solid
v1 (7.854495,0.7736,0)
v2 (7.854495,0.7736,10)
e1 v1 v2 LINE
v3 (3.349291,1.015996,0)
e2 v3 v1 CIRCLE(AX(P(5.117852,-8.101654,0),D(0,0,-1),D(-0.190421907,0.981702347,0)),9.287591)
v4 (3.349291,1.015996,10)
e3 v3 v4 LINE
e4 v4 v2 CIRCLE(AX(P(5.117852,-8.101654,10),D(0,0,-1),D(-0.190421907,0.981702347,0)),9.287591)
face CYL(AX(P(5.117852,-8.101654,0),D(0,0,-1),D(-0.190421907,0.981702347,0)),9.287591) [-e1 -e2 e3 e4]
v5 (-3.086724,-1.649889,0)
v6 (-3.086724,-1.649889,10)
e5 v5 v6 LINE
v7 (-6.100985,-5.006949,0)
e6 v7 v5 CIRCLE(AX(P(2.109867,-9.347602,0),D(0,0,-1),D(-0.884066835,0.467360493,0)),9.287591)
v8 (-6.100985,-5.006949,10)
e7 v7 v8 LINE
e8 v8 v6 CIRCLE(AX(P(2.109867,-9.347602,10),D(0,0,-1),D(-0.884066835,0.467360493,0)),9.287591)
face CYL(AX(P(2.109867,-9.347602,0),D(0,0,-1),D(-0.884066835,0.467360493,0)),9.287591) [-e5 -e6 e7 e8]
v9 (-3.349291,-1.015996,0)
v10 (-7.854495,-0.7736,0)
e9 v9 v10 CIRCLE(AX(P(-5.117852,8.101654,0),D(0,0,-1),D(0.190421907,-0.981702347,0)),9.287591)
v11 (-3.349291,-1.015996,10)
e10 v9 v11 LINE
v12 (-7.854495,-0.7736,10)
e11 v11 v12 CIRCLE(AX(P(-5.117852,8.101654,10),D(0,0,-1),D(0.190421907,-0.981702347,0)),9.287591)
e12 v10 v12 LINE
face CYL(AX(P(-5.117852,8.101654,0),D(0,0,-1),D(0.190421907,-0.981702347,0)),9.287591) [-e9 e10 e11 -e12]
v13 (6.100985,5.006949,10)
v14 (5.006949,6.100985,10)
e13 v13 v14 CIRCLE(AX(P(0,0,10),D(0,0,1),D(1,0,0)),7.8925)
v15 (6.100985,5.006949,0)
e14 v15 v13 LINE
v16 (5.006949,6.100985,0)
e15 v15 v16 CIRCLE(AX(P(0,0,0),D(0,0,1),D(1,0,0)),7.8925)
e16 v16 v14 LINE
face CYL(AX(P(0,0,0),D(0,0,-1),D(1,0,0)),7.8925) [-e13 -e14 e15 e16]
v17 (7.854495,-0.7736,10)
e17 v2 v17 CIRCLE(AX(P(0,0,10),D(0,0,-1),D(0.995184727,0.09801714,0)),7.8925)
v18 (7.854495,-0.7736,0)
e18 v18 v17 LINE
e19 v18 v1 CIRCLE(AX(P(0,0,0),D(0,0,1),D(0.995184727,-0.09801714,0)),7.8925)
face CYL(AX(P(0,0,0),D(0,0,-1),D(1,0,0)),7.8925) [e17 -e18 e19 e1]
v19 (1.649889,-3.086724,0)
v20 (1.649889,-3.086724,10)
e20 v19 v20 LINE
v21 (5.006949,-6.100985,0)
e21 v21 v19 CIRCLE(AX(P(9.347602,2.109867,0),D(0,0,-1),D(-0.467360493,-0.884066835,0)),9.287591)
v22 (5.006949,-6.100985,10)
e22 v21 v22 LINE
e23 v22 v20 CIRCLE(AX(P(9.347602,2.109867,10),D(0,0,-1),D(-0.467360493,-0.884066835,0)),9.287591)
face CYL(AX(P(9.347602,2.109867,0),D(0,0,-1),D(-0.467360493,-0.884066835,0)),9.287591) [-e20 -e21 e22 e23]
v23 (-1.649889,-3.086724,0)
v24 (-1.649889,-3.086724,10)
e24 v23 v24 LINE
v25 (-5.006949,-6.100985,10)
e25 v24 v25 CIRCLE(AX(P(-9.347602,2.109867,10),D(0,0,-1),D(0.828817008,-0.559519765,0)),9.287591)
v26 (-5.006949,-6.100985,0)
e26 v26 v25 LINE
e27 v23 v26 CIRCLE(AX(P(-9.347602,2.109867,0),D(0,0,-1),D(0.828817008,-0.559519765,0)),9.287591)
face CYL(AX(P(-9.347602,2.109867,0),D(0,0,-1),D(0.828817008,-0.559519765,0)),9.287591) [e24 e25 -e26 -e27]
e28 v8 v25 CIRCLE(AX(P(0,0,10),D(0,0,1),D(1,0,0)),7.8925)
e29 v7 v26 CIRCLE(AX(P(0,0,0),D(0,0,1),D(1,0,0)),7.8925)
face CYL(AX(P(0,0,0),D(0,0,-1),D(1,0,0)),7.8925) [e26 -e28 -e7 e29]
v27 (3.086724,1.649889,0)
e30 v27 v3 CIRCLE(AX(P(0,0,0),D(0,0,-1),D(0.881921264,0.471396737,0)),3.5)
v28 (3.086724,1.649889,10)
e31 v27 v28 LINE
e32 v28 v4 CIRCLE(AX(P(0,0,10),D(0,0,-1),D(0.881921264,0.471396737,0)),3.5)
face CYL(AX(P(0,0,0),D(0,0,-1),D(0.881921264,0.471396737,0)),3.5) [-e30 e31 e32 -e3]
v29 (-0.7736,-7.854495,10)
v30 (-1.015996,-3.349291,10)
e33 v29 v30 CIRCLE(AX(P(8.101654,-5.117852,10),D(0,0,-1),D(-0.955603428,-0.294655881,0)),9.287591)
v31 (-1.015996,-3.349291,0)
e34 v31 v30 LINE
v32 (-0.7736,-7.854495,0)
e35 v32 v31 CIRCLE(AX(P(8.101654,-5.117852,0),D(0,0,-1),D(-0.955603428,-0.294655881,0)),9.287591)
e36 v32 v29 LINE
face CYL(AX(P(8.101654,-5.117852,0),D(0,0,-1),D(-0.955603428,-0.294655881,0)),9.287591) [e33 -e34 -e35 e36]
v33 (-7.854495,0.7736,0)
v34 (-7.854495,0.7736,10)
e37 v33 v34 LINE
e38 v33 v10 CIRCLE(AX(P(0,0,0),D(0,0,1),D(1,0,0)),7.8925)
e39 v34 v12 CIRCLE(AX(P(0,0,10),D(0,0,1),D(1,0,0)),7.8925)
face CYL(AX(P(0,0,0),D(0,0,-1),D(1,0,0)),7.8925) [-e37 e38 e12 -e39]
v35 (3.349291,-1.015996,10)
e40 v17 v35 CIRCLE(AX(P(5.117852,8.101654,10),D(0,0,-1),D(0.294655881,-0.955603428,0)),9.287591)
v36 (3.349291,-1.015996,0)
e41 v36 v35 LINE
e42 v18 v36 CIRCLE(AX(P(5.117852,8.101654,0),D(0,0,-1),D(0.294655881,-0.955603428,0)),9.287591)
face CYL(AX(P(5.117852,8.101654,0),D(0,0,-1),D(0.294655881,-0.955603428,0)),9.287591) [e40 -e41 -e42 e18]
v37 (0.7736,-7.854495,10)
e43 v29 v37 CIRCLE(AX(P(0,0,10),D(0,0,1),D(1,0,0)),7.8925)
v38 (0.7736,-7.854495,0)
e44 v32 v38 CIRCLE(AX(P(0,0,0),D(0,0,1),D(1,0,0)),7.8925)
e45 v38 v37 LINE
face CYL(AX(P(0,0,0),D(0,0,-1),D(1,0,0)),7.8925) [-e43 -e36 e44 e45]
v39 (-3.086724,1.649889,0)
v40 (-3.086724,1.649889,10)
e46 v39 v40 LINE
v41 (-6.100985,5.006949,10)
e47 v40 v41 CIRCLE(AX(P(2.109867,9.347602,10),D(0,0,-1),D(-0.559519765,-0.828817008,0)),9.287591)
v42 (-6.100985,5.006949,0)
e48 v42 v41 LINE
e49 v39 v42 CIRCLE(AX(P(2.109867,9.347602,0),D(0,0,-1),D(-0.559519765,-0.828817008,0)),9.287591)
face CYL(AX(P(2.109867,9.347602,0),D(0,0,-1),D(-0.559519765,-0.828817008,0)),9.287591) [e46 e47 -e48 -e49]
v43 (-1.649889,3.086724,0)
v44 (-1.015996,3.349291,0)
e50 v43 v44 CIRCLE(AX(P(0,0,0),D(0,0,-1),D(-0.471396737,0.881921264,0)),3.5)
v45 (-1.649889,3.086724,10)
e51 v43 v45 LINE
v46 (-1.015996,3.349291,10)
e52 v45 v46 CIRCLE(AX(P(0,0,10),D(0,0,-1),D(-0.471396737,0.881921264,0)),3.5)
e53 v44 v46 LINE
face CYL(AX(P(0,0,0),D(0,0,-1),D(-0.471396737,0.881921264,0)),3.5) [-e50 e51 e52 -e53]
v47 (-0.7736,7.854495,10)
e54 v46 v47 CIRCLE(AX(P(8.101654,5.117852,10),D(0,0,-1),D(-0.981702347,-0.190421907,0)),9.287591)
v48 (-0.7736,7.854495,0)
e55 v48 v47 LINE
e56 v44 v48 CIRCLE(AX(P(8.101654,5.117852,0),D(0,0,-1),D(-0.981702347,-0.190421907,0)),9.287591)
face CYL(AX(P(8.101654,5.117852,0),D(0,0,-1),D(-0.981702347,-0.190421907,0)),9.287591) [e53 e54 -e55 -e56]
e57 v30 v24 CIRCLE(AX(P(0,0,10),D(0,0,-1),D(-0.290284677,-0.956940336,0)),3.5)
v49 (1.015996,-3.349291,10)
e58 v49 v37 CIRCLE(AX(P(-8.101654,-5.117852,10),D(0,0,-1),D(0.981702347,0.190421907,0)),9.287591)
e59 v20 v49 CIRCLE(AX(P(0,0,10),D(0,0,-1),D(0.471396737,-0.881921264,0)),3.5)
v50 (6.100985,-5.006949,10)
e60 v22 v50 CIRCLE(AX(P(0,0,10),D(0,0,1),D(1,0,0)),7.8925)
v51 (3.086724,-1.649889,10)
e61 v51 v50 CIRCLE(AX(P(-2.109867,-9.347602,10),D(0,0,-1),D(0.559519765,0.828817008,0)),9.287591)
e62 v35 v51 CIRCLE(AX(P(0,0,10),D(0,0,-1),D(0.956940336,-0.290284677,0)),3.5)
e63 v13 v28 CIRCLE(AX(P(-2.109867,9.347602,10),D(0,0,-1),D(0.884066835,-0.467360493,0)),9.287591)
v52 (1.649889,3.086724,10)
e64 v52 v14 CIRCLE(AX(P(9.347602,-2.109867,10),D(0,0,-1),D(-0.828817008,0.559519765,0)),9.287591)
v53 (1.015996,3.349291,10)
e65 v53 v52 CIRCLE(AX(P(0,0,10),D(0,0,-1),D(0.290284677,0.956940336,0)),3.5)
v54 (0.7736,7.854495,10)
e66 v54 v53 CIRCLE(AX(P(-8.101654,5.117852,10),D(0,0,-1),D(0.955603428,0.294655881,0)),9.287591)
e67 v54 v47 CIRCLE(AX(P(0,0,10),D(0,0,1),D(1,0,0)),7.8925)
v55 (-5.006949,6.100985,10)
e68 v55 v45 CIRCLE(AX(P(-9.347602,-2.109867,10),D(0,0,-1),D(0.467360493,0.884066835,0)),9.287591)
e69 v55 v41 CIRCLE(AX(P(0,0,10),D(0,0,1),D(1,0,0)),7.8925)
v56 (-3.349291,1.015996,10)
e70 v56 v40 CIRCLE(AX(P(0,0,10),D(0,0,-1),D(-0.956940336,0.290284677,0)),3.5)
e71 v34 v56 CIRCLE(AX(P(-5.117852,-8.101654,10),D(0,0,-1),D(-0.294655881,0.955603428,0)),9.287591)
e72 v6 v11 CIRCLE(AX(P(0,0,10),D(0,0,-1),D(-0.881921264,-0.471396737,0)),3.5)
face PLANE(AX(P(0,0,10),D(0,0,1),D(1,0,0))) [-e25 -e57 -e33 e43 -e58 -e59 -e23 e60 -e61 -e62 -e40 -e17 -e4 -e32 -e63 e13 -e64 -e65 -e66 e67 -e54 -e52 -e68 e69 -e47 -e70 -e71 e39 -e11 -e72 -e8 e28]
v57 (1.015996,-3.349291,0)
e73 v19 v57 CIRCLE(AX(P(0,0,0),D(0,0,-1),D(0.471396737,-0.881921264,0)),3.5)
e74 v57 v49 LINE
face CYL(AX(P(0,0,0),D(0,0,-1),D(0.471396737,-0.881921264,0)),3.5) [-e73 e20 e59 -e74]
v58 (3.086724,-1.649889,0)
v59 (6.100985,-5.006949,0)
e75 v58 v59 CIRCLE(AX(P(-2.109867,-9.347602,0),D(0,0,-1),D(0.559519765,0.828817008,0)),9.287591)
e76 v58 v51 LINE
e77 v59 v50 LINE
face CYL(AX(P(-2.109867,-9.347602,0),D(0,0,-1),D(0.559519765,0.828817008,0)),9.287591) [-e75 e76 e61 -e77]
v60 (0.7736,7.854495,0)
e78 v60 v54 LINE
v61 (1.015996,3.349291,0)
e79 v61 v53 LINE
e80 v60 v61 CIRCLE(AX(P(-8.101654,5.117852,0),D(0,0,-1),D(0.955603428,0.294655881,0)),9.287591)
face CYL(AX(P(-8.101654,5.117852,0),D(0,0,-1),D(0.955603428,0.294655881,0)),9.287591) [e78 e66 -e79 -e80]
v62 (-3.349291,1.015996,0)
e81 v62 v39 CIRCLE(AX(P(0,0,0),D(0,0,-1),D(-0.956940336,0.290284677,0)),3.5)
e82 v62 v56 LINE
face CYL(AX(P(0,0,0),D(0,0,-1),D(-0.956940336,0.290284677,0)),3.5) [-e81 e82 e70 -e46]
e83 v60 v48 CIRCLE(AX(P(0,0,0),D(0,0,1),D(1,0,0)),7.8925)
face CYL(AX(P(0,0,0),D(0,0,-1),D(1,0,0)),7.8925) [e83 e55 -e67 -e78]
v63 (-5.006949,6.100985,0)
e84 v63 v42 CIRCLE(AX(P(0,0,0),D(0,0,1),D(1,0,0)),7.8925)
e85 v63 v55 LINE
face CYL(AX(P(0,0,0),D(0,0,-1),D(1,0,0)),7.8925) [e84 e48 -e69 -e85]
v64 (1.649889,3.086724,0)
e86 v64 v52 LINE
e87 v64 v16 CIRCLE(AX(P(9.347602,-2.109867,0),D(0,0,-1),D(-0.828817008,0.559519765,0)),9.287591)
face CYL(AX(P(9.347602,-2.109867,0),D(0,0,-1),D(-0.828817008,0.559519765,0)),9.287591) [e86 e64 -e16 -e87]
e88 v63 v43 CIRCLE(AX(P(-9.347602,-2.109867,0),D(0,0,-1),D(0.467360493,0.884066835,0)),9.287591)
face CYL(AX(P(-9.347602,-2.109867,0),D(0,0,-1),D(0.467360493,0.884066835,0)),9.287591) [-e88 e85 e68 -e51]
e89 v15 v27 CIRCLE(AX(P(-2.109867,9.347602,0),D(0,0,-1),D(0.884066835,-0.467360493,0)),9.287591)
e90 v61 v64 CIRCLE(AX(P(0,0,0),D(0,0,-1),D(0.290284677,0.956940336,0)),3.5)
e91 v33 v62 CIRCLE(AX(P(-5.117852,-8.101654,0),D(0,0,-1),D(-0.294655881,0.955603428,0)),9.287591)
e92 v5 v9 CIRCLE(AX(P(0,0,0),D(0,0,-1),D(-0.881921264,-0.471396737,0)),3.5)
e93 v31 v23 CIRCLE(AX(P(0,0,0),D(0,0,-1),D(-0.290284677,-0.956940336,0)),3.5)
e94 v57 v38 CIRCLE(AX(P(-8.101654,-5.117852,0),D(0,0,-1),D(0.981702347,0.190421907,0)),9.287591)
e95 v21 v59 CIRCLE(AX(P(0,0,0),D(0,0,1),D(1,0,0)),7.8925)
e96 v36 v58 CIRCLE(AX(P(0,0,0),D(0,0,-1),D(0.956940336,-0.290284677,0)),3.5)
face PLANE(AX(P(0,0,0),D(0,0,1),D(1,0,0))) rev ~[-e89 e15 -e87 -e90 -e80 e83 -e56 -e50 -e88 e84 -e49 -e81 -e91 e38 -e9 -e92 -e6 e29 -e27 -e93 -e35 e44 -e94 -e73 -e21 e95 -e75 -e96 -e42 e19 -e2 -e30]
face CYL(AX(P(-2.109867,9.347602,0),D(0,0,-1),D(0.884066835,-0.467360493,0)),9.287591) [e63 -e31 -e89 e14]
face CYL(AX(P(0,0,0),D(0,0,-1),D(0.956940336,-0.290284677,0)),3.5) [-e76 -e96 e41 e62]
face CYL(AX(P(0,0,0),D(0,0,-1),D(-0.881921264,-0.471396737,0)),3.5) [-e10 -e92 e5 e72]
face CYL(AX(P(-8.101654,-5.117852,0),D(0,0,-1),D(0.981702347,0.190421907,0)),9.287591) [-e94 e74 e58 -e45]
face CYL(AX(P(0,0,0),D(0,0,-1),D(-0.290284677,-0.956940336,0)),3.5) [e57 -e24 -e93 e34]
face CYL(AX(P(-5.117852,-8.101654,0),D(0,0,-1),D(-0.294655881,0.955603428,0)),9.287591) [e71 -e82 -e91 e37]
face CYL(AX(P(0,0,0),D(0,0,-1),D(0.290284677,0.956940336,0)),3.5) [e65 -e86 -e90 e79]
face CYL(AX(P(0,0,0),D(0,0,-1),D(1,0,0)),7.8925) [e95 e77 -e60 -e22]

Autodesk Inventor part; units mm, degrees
sketch "Sketch1" plane through (0, 0, 0) normal (0, 0, 1) x (1, 0, 0)
  circle A0 centre (0, 0) radius 7.8925
  dimension "d0" = 15.785
extrude "Extrusion1" add sketch "Sketch1" along normal blind 10
ref_plane "Work Plane2" through (0, 0, 5) normal (0, 0, 1) x (1, 0, 0)
sketch "Sketch2" plane through (0, 0, 0) normal (0, 0, -1) x (-1, 0, 0)
  circle A0 centre (0, 0) radius 7.8925 projected
  circle A1 centre (0, 0) radius 6
  dimension "d3" = 12
surface extrude "Pitch Diameter" sketch "Sketch2" against normal through all shown no curves A1
ref_plane "Work Plane8" through (0, 0, 0) normal (0.9238795, 0.3826834, 0) x (0, 0, 1)
ref_plane "Work Plane9" through (0, 0, 0) normal (1, 0, 0) x (0, 1, 0)
spur gear teeth "Spur Gear" teeth 8 pitch diameter 12 tip diameter 15.785 root diameter 7 face width 10 start plane through (0, 0, 0) normal (0, 0, -1) x (-1, 0, 0)
equation "\"d0\" = da_da"
equation "\"d1\" = da_b"
equation "\"d3\" = da_d"
equation "\"da_da\" = 15.785039"
equation "\"da_b\" = 10"
equation "\"da_d\" = 12"
properties part number "Spur Gear1" material "Steel"
